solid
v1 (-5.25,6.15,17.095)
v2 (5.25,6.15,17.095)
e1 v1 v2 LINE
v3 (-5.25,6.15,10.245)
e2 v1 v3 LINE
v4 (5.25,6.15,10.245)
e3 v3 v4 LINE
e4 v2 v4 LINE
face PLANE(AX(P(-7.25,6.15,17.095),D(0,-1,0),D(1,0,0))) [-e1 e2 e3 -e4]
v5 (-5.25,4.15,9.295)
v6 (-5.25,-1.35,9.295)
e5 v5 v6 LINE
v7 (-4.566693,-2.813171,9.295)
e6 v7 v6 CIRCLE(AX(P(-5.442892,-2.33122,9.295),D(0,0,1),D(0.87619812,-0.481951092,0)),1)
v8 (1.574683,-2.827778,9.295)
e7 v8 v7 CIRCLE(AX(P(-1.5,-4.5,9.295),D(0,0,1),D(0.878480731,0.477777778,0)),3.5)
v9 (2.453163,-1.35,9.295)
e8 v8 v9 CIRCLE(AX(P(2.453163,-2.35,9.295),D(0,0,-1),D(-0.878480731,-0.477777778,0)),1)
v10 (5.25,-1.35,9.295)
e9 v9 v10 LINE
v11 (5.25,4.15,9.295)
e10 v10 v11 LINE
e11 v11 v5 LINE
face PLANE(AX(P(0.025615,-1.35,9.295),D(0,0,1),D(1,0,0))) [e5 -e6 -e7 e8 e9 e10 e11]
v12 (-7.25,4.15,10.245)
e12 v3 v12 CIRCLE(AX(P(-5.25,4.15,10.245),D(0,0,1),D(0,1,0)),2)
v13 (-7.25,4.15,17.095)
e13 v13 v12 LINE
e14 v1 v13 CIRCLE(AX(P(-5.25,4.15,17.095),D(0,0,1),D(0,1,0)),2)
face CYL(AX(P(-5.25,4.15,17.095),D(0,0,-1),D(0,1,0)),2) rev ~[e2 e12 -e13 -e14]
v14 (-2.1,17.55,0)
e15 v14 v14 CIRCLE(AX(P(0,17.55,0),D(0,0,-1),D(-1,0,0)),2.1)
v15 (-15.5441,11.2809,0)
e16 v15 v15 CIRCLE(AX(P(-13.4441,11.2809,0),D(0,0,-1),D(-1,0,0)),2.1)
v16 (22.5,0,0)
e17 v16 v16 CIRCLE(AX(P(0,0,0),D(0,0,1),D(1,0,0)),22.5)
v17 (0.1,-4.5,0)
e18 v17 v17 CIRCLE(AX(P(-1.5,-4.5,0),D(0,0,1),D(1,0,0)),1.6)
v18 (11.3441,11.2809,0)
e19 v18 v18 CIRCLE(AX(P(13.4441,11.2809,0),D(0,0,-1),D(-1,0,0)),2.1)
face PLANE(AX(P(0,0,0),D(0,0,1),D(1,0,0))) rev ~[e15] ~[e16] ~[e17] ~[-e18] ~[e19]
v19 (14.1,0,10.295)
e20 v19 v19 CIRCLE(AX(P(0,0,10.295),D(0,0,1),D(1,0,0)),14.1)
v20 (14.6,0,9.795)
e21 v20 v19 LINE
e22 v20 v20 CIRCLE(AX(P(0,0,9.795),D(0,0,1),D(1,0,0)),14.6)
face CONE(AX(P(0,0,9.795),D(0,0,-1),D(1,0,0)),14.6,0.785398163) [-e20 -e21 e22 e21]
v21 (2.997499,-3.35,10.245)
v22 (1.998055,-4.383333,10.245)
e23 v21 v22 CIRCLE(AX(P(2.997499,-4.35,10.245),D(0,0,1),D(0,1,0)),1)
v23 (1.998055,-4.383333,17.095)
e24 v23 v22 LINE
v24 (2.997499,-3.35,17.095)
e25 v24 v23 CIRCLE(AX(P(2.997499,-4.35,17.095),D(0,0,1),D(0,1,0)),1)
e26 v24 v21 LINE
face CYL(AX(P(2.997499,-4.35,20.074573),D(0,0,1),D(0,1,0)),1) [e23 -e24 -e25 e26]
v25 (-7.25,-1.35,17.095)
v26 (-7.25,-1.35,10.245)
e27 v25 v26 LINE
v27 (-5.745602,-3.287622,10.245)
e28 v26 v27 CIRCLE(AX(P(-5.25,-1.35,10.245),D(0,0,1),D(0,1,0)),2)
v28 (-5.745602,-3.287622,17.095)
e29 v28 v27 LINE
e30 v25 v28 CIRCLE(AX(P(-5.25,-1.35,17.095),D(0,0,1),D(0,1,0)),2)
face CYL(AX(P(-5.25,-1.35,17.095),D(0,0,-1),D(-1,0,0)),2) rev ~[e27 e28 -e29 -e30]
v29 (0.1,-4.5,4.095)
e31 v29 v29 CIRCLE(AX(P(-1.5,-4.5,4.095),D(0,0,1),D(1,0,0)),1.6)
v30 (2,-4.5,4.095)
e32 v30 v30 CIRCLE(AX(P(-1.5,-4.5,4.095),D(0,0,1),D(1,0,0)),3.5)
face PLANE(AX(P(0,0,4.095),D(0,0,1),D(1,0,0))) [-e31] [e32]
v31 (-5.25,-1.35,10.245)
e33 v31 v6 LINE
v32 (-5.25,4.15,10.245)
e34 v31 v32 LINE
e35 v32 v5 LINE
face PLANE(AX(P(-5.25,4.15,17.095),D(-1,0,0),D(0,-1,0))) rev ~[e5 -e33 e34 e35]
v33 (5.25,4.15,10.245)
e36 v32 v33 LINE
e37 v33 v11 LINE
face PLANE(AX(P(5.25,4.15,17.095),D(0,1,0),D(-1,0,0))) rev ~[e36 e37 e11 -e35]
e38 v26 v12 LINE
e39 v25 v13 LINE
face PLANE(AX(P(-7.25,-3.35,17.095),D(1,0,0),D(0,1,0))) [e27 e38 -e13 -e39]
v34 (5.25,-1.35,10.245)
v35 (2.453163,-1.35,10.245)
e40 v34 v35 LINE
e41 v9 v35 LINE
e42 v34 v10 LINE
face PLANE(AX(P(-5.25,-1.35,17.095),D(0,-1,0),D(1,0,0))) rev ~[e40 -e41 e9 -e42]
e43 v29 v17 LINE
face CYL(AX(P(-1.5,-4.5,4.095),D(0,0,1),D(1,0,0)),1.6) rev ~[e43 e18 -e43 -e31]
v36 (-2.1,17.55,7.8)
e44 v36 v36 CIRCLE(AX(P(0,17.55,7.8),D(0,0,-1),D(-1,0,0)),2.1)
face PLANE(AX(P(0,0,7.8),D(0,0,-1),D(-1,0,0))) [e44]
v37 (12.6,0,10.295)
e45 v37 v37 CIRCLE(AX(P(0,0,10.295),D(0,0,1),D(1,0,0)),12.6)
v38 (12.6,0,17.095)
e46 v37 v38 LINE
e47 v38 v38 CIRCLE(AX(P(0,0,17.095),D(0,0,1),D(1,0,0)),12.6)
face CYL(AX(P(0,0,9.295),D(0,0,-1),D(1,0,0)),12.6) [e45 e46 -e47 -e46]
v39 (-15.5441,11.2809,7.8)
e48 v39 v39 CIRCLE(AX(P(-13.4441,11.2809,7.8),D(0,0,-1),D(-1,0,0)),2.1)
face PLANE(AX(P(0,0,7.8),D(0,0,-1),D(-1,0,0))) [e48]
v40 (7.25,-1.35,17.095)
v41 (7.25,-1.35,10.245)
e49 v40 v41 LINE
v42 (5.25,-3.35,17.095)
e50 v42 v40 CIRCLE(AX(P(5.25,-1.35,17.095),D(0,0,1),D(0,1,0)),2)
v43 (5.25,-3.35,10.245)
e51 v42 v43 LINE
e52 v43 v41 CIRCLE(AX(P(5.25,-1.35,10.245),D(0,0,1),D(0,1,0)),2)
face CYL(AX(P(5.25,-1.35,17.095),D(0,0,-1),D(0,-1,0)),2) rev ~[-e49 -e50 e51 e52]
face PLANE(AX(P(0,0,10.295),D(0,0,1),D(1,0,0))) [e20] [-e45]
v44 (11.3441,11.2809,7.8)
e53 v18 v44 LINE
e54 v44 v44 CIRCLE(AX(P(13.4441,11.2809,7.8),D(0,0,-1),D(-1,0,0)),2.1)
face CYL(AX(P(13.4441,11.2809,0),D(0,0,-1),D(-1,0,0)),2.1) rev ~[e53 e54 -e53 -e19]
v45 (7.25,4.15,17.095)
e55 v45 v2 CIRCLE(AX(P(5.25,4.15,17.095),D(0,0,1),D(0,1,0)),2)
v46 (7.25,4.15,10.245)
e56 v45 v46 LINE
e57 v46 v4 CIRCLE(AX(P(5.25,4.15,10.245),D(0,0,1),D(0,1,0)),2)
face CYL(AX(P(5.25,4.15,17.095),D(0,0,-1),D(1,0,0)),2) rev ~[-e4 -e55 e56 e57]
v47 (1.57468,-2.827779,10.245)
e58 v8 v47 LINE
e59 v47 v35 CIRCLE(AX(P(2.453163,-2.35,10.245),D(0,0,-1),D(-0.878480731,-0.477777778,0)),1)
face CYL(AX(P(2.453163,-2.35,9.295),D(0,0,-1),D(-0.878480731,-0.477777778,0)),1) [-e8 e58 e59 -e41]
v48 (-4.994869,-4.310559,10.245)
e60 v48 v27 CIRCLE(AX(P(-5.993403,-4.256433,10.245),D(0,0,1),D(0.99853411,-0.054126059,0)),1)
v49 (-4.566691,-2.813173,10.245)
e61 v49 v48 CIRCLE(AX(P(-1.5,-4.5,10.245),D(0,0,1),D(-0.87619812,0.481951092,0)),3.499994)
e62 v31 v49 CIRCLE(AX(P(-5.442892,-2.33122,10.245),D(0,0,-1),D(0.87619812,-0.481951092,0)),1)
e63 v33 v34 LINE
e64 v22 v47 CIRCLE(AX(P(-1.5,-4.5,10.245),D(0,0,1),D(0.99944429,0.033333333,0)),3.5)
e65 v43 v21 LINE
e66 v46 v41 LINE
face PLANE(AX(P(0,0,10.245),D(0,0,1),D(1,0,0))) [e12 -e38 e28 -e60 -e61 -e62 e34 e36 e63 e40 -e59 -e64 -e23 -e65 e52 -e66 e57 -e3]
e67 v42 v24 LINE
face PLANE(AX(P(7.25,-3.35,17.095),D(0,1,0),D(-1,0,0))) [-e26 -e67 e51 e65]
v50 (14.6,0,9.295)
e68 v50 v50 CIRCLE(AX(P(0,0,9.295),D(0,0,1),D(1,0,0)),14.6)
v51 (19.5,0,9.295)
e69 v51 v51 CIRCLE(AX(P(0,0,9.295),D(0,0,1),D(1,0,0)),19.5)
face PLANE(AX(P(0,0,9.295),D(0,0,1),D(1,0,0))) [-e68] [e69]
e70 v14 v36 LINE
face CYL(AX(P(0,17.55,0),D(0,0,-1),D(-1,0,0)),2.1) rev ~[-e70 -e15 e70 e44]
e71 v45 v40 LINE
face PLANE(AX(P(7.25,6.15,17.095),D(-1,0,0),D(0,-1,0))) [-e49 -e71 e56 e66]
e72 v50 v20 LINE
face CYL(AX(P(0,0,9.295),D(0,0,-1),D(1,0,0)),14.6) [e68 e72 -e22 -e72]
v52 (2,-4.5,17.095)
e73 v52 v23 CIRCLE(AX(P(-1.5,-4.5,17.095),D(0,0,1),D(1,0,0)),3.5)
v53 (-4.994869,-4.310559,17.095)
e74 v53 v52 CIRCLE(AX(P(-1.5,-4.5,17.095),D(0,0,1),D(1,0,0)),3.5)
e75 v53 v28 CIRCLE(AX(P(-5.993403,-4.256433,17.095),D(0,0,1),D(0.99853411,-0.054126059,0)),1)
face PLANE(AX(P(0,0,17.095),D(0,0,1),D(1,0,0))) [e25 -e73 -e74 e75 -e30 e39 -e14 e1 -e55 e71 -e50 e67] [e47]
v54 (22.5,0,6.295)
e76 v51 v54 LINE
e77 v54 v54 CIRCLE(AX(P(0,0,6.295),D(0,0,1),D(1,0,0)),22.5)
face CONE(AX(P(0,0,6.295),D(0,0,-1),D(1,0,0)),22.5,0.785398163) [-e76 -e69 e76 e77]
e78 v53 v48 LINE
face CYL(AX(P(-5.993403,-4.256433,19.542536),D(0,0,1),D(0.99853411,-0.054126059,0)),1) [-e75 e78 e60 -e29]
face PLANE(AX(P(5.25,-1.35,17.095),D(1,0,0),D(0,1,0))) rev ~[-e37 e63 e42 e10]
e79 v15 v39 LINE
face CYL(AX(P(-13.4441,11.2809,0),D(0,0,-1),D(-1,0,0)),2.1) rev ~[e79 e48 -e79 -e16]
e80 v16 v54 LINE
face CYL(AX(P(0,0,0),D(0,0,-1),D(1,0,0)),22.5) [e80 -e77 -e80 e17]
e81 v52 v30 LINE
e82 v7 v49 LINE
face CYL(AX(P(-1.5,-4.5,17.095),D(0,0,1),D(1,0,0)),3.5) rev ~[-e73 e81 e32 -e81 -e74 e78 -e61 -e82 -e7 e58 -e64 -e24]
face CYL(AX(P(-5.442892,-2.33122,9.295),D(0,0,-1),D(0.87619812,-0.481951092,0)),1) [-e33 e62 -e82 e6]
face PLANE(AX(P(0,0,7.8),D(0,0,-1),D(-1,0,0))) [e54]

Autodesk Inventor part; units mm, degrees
ref_plane "YZ Plane" through (0, 0, 0) normal (1, 0, 0) x (0, 1, 0)
ref_plane "XZ Plane" through (0, 0, 0) normal (0, 1, 0) x (-1, 0, 0)
ref_plane "XY Plane" through (0, 0, 0) normal (0, 0, 1) x (1, 0, 0)
sketch "Эскиз1" plane through (0, 0, 0) normal (0, 0, 1) x (1, 0, 0)
  circle A0 centre (0, 0) radius 22.5
  dimension "d0" = 45
extrude "Выдавливание1" add sketch "Эскиз1" along normal blind 9.295
sketch "Эскиз2" plane through (0, 0, 9.295) normal (0, 0, 1) x (1, 0, 0)
  circle A0 centre (0, 0) radius 12.6
  dimension "d3" = 25.2
extrude "Выдавливание2" add sketch "Эскиз2" along normal blind 7.8
sketch "Эскиз3" plane through (0, 0, 9.295) normal (0, 0, 1) x (1, 0, 0)
  circle A0 centre (0, 0) radius 12.6 projected
  circle A1 centre (0, 0) radius 22.5 projected
  circle A2 centre (0, 0) radius 14.6
  dimension "d6" = 2
extrude "Выдавливание3" add sketch "Эскиз3" along normal blind 1 contours A2
chamfer "Фаска1" distance 0.5 angle 45 1 edges at (-14.6, 0, 10.295)
sketch "Эскиз4" plane through (0, 0, 17.095) normal (0, 0, 1) x (1, 0, 0)
  line L0 (0, 0) -> (0, -1.1)
  line L1 (5, -1.1) -> (-5, -1.1)
  line L2 (-5, -1.1) -> (-5, 3.9)
  line L3 (-5, 3.9) -> (5, 3.9)
  line L4 (5, 3.9) -> (5, -1.1)
  circle A0 centre (0, 0) radius 12.6 projected
  line L5 (-5.25, -1.35) -> (5.25, -1.35)
  line L6 (5.25, -1.35) -> (5.25, 4.15)
  line L7 (5.25, 4.15) -> (-5.25, 4.15)
  line L8 (-5.25, 4.15) -> (-5.25, -1.35)
  dimension "d45" = 1.1
  dimension "d46" = 10
  dimension "d47" = 5
  dimension "d48" = 0.25
extrude "Выдавливание4" cut sketch "Эскиз4" against normal blind 7.8 contours L1 L2 L3 L4 | L8 L7 L6 L5
sketch "Эскиз5" plane through (0, 0, 0) normal (0, 0, -1) x (-1, 0, 0)
  circle A0 centre (13.4441, 11.2809) radius 1.5 projected
  circle A1 centre (0, 17.55) radius 1.5 projected
  circle A2 centre (-13.4441, 11.2809) radius 1.5 projected
  circle A3 centre (13.4441, 11.2809) radius 2.1
  circle A4 centre (0, 17.55) radius 2.1
  circle A5 centre (-13.4441, 11.2809) radius 2.1
  point P0 (0, 0)
  dimension "d16" = 4.2
  dimension "d17" = 4.2
  dimension "d18" = 4.2
extrude "Выдавливание5" cut sketch "Эскиз5" against normal blind 7.8 contours A0 | A1 | A2 | A3 | A4 | A5
sketch "Эскиз6" plane through (0, 0, 17.095) normal (0, 0, 1) x (1, 0, 0)
  circle A0 centre (-1.5, -4.5) radius 1.5 projected
  circle A1 centre (-1.5, -4.5) radius 3.5
  point P0 (0, 0)
  dimension "d21" = 7
extrude "Выдавливание6" cut sketch "Эскиз6" against normal blind 13 contours A0 | A1
sketch "Эскиз7" plane through (-1.5, -4.5, 4.095) normal (0, 0, 1) x (1, 0, 0)
  circle A0 centre (0, 0) radius 3.5 projected
  circle A1 centre (0, 0) radius 1.6
  point P0 (1.5, 4.5)
  dimension "d24" = 3.2
extrude "Выдавливание7" cut sketch "Эскиз7" against normal blind 13 contours A1
chamfer "Фаска2" distance 3 angle 45 1 edges at (-22.5, 0, 9.295)
sketch "Эскиз10" plane through (0, 0, 17.095) normal (0, 0, 1) x (1, 0, 0)
  arc A0 (0.0256, -1.35) -> (-3.0256, -1.35) centre (-1.5, -4.5) ccw projected
  line L0 (5.25, -1.35) -> (0.0256, -1.35) projected
  line L1 (5.25, 4.15) -> (5.25, -1.35) projected
  line L2 (-5.25, 4.15) -> (5.25, 4.15) projected
  line L3 (-5.25, -1.35) -> (-5.25, 4.15) projected
  line L4 (-3.0256, -1.35) -> (-5.25, -1.35) projected
  circle A1 centre (0, 0) radius 12.6 projected
  arc A2 (-3.0256, -1.35) -> (0.0256, -1.35) centre (-1.5, -4.5) ccw projected
  line L5 (-3.0256, -1.35) -> (-5.25, -1.35) projected
  line L6 (-5.25, -1.35) -> (-5.25, 4.15) projected
  line L7 (-5.25, 4.15) -> (5.25, 4.15) projected
  line L8 (5.25, 4.15) -> (5.25, -1.35) projected
  line L9 (5.25, -1.35) -> (0.0256, -1.35) projected
  arc A3 (-0.5369, -3.35) -> (-2.4631, -3.35) centre (-1.5, -4.5) ccw
  line L10 (-2.4631, -3.35) -> (-7.25, -3.35)
  line L11 (-7.25, -3.35) -> (-7.25, 6.15)
  line L12 (-7.25, 6.15) -> (7.25, 6.15)
  line L13 (7.25, 6.15) -> (7.25, -3.35)
  line L14 (7.25, -3.35) -> (-0.5369, -3.35)
  point P0 (-4.8057, -3.35)
  point P1 (-3.0256, -1.35)
  point P2 (0.0256, -1.35)
  point P3 (1.8057, -3.35)
  dimension "d49" = 2
extrude "Выдавливание10" cut sketch "Эскиз10" against normal blind 6.85 contours L0 L1 L2 L3 L4 A2 L10 L11 L12 L13 L14
fillet "Сопряжение3" radius 2 4 edges at (7.25, -3.35, 13.67) (-7.25, -3.35, 13.67) (-7.25, 6.15, 13.67) (7.25, 6.15, 13.67)
fillet "Сопряжение4" radius 1 4 edges at (1.8057, -3.35, 13.67) (-4.8057, -3.35, 13.67) (0.0256, -1.35, 9.77) (-3.0256, -1.35, 9.77)
properties part number "wheel_fixator"
